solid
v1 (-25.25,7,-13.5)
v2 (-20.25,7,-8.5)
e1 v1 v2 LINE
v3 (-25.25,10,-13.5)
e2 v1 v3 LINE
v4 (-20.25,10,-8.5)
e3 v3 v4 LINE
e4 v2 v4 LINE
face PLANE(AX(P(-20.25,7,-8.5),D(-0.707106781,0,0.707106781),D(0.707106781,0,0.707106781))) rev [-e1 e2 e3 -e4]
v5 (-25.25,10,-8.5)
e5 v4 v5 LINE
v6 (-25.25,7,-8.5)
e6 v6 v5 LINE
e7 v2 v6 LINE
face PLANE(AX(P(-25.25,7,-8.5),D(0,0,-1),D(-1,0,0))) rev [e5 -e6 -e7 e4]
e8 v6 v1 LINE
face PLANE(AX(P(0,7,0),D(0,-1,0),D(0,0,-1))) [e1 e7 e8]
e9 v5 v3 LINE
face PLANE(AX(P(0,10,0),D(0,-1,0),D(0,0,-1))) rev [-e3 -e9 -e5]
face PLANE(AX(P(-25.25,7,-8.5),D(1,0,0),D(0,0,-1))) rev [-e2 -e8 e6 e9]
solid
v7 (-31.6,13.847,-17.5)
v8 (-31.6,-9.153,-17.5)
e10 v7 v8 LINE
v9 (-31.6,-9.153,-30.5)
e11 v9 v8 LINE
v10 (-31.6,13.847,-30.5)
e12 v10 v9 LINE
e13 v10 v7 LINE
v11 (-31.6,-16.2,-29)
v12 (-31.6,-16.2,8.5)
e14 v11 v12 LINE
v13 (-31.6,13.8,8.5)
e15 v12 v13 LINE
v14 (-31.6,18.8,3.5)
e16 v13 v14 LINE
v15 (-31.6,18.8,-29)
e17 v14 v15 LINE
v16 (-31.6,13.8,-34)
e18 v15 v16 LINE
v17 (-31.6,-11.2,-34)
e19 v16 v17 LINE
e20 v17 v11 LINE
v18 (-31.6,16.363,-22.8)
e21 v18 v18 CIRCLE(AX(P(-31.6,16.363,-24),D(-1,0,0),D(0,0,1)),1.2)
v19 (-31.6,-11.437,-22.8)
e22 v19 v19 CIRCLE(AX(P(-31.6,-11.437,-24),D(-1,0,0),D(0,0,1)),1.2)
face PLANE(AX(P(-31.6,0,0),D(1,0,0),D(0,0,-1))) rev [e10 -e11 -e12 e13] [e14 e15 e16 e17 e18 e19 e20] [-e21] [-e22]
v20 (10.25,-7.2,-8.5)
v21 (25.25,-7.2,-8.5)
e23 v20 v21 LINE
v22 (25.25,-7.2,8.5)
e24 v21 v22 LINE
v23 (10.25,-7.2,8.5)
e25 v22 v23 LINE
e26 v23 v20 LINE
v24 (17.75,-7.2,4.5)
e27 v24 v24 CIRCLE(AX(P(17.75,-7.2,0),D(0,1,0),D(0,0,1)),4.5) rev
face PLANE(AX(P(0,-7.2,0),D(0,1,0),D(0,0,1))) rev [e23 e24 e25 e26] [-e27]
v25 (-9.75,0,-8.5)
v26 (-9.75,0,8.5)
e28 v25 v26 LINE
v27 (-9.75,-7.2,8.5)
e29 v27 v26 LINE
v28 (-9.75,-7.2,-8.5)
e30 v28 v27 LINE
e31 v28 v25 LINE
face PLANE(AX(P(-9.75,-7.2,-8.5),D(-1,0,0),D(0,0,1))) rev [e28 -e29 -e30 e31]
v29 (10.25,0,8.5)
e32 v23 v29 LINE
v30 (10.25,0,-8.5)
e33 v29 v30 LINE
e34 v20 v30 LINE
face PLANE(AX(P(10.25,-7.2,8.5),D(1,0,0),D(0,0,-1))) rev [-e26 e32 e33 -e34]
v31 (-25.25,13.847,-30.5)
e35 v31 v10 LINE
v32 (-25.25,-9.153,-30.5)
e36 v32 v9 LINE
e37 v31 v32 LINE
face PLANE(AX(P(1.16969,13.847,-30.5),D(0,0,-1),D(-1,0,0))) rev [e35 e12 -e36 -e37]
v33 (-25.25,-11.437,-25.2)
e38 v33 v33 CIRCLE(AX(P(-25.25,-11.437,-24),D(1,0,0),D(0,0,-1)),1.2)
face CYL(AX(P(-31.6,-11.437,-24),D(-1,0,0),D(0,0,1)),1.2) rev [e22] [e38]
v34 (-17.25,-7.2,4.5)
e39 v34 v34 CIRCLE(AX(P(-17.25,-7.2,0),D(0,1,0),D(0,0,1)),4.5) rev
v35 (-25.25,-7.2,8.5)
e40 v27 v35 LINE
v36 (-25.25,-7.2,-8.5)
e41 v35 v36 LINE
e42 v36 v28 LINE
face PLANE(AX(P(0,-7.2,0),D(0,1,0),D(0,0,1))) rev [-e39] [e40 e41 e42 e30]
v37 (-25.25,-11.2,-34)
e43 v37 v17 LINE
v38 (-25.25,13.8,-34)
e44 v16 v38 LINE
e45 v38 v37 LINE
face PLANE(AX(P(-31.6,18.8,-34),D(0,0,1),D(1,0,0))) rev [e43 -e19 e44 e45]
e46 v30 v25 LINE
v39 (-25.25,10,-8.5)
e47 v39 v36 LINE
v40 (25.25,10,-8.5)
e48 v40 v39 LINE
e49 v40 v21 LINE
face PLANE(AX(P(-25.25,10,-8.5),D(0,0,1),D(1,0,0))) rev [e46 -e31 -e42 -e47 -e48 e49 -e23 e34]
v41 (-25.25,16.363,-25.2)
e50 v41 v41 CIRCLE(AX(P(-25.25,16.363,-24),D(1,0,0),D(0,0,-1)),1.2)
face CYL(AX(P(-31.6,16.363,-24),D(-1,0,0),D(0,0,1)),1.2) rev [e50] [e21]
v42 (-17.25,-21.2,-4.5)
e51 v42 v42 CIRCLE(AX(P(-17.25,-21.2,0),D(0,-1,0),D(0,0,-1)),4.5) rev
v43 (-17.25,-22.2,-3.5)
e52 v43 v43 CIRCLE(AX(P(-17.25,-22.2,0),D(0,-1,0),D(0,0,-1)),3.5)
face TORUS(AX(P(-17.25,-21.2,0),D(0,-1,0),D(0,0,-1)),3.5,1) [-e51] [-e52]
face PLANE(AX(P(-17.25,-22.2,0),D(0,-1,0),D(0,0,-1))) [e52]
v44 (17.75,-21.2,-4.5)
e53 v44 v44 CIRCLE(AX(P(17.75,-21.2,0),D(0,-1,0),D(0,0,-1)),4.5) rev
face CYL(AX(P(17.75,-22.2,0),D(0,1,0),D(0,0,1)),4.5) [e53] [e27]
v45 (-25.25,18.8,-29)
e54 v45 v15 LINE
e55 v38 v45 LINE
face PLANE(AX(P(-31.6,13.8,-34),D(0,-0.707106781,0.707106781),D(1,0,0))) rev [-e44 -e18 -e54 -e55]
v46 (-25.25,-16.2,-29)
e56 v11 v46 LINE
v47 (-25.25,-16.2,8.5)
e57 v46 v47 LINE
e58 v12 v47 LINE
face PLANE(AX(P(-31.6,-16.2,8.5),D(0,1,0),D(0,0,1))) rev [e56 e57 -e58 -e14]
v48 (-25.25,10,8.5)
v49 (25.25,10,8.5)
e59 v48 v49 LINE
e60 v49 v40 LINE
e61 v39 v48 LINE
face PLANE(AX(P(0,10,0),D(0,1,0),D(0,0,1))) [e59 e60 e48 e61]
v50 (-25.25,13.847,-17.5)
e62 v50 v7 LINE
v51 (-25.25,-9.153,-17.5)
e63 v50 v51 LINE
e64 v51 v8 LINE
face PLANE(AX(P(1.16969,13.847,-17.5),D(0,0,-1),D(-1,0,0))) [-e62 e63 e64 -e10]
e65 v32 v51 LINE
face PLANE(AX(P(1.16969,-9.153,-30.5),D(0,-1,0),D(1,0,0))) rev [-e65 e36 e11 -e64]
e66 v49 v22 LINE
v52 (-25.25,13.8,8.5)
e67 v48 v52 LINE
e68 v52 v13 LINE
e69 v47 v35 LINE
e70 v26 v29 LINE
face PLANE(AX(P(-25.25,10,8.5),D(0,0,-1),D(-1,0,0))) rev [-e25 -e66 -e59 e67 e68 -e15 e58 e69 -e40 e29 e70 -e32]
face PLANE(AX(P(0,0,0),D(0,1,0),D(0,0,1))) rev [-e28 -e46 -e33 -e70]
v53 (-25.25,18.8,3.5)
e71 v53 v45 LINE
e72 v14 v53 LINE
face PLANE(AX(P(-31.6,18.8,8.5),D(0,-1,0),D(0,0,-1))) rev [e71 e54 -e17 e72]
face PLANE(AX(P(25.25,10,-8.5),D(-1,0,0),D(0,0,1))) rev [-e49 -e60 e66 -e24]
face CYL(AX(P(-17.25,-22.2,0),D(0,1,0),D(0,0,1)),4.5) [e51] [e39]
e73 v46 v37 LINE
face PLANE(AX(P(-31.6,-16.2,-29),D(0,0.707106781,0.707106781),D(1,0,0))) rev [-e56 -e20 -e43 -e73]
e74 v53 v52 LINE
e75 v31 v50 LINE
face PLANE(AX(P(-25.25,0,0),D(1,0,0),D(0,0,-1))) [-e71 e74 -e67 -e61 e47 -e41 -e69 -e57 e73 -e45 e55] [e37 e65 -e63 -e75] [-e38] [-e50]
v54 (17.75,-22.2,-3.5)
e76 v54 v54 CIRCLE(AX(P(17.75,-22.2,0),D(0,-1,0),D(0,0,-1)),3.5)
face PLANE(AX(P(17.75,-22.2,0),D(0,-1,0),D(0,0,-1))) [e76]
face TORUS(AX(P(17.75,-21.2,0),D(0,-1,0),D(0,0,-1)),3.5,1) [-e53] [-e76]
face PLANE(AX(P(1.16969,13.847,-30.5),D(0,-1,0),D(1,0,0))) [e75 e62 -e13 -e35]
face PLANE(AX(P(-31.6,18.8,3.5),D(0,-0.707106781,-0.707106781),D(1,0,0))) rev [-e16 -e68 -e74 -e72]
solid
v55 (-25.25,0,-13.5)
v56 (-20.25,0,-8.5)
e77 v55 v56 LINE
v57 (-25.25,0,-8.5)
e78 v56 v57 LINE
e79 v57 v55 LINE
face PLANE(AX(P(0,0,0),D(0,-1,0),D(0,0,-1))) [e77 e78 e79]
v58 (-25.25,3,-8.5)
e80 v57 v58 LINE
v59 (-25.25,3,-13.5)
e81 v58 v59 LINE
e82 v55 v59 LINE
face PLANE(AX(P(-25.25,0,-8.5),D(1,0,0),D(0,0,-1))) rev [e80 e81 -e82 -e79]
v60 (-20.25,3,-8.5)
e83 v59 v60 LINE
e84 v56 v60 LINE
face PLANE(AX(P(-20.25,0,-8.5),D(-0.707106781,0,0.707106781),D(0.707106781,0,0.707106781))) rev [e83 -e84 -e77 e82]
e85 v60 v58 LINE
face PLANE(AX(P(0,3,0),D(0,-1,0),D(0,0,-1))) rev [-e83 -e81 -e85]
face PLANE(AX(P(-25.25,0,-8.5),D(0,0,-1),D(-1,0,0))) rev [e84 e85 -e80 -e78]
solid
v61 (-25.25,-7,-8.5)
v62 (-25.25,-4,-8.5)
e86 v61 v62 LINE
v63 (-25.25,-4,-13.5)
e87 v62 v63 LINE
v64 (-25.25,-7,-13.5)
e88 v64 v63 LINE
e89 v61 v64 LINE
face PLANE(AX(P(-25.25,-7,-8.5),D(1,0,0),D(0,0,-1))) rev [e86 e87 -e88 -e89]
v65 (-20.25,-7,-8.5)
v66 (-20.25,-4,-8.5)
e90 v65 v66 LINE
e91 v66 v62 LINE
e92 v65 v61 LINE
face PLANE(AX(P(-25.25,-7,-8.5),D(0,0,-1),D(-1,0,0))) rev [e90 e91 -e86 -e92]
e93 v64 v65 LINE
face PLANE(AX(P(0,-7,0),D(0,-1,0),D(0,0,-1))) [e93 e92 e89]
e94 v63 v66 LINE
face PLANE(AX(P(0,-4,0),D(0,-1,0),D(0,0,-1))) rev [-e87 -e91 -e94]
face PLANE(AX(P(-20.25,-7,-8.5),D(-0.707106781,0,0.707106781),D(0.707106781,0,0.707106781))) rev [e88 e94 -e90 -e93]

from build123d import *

# Parameters (mm, degrees)
SKETCH1_W            = 50.5
SKETCH1_H            = 17
BOSS_EXTRUDE1_DEPTH  = 10
SKETCH2_W            = 15.5
SKETCH2_H            = 17
SKETCH2_W_2          = 15
BOSS_EXTRUDE2_DEPTH  = 7.2
SKETCH5_W            = 42.5
SKETCH5_H            = 35
BOSS_EXTRUDE3_DEPTH  = 6.35
SKETCH6_W            = 13
SKETCH6_H            = 23
CUT_EXTRUDE1_DEPTH   = 6.35
M2_CLEARANCE_HOLE1_D = 2.4
CHAMFER1_SIZE        = 5
GUSSET1_START        = 7
GUSSET1_DEPTH        = 3
LPATTERN2_COUNT      = 3
LPATTERN2_PITCH      = 7
SKETCH10_R           = 4.5
BOSS_EXTRUDE4_DEPTH  = 15
FILLET1_R            = 1


# Read off the part's stored shape, not the designer's step: Gusset1
with BuildPart() as part:
    # Sketch1 → Boss-Extrude1 (new body)
    with BuildSketch(Plane(origin=(0, 0, 0), x_dir=(1, 0, 0), z_dir=(0, 1, 0))):
        Rectangle(SKETCH1_W, SKETCH1_H)
    extrude(amount=BOSS_EXTRUDE1_DEPTH)

    # Sketch2 → Boss-Extrude2 (add)
    with BuildSketch(Plane.XZ):
        with Locations((-17.5, 0)):
            Rectangle(SKETCH2_W, SKETCH2_H)
        with Locations((17.75, 0)):
            Rectangle(SKETCH2_W_2, SKETCH2_H)
    extrude(amount=BOSS_EXTRUDE2_DEPTH)

    # Sketch5 → Boss-Extrude3 (add)
    with BuildSketch(Plane.ZY.offset(25.25)):
        with Locations((-12.75, 1.3)):
            Rectangle(SKETCH5_W, SKETCH5_H)
    extrude(amount=BOSS_EXTRUDE3_DEPTH)

    # Sketch6 → Cut-Extrude1 (cut)
    with BuildSketch(Plane.ZY.offset(31.6)):
        with Locations((-24, 2.347)):
            Rectangle(SKETCH6_W, SKETCH6_H)
    extrude(amount=-CUT_EXTRUDE1_DEPTH, mode=Mode.SUBTRACT)

    # M2 Clearance Hole1 (through all)
    with Locations(Plane.ZY.offset(31.6)):
        with Locations((-24, 16.363), (-24, -11.437)):
            Hole(M2_CLEARANCE_HOLE1_D / 2)

    # Chamfer1
    chamfer1_edges = [part.edges().sort_by_distance(p)[0] for p in [
        (-28.425, 18.8, 8.5),
        (-28.425, 18.8, -34),
        (-28.425, -16.2, -34),
    ]]
    chamfer(chamfer1_edges, length=CHAMFER1_SIZE)

    # Sketch10 → Boss-Extrude4 (add)
    with BuildSketch(Plane.XZ.offset(7.2)):
        with Locations(Location((17.75, 0, 0), (0, 0, 90))):
            Circle(SKETCH10_R)
        with Locations(Location((-17.25, 0, 0), (0, 0, 90))):
            Circle(SKETCH10_R)
    extrude(amount=BOSS_EXTRUDE4_DEPTH)

    # Fillet1
    fillet1_edges = [part.edges().sort_by_distance(p)[0] for p in [
        (17.75, -22.2, -4.5),
        (-17.25, -22.2, -4.5),
    ]]
    fillet(fillet1_edges, radius=FILLET1_R)


with BuildPart() as body_2:
    # Gusset1 outline → Gusset1 (new body)
    with BuildSketch(Plane(origin=(0, 0, 0), x_dir=(1, 0, 0), z_dir=(0, 1, 0)).offset(GUSSET1_START)):
        Polygon((-20.25, 8.5), (-25.25, 13.5), (-25.25, 8.5), align=None)
    extrude(amount=GUSSET1_DEPTH)


with BuildPart() as lpattern2_1:
    # LPattern2: pattern copy
    add(body_2.part.moved(Location(Vector(0, -1, 0) * (1 * LPATTERN2_PITCH))))


with BuildPart() as lpattern2_2:
    # LPattern2: pattern copy
    add(body_2.part.moved(Location(Vector(0, -1, 0) * (2 * LPATTERN2_PITCH))))


solid = Compound([part.part, body_2.part, lpattern2_1.part, lpattern2_2.part])
